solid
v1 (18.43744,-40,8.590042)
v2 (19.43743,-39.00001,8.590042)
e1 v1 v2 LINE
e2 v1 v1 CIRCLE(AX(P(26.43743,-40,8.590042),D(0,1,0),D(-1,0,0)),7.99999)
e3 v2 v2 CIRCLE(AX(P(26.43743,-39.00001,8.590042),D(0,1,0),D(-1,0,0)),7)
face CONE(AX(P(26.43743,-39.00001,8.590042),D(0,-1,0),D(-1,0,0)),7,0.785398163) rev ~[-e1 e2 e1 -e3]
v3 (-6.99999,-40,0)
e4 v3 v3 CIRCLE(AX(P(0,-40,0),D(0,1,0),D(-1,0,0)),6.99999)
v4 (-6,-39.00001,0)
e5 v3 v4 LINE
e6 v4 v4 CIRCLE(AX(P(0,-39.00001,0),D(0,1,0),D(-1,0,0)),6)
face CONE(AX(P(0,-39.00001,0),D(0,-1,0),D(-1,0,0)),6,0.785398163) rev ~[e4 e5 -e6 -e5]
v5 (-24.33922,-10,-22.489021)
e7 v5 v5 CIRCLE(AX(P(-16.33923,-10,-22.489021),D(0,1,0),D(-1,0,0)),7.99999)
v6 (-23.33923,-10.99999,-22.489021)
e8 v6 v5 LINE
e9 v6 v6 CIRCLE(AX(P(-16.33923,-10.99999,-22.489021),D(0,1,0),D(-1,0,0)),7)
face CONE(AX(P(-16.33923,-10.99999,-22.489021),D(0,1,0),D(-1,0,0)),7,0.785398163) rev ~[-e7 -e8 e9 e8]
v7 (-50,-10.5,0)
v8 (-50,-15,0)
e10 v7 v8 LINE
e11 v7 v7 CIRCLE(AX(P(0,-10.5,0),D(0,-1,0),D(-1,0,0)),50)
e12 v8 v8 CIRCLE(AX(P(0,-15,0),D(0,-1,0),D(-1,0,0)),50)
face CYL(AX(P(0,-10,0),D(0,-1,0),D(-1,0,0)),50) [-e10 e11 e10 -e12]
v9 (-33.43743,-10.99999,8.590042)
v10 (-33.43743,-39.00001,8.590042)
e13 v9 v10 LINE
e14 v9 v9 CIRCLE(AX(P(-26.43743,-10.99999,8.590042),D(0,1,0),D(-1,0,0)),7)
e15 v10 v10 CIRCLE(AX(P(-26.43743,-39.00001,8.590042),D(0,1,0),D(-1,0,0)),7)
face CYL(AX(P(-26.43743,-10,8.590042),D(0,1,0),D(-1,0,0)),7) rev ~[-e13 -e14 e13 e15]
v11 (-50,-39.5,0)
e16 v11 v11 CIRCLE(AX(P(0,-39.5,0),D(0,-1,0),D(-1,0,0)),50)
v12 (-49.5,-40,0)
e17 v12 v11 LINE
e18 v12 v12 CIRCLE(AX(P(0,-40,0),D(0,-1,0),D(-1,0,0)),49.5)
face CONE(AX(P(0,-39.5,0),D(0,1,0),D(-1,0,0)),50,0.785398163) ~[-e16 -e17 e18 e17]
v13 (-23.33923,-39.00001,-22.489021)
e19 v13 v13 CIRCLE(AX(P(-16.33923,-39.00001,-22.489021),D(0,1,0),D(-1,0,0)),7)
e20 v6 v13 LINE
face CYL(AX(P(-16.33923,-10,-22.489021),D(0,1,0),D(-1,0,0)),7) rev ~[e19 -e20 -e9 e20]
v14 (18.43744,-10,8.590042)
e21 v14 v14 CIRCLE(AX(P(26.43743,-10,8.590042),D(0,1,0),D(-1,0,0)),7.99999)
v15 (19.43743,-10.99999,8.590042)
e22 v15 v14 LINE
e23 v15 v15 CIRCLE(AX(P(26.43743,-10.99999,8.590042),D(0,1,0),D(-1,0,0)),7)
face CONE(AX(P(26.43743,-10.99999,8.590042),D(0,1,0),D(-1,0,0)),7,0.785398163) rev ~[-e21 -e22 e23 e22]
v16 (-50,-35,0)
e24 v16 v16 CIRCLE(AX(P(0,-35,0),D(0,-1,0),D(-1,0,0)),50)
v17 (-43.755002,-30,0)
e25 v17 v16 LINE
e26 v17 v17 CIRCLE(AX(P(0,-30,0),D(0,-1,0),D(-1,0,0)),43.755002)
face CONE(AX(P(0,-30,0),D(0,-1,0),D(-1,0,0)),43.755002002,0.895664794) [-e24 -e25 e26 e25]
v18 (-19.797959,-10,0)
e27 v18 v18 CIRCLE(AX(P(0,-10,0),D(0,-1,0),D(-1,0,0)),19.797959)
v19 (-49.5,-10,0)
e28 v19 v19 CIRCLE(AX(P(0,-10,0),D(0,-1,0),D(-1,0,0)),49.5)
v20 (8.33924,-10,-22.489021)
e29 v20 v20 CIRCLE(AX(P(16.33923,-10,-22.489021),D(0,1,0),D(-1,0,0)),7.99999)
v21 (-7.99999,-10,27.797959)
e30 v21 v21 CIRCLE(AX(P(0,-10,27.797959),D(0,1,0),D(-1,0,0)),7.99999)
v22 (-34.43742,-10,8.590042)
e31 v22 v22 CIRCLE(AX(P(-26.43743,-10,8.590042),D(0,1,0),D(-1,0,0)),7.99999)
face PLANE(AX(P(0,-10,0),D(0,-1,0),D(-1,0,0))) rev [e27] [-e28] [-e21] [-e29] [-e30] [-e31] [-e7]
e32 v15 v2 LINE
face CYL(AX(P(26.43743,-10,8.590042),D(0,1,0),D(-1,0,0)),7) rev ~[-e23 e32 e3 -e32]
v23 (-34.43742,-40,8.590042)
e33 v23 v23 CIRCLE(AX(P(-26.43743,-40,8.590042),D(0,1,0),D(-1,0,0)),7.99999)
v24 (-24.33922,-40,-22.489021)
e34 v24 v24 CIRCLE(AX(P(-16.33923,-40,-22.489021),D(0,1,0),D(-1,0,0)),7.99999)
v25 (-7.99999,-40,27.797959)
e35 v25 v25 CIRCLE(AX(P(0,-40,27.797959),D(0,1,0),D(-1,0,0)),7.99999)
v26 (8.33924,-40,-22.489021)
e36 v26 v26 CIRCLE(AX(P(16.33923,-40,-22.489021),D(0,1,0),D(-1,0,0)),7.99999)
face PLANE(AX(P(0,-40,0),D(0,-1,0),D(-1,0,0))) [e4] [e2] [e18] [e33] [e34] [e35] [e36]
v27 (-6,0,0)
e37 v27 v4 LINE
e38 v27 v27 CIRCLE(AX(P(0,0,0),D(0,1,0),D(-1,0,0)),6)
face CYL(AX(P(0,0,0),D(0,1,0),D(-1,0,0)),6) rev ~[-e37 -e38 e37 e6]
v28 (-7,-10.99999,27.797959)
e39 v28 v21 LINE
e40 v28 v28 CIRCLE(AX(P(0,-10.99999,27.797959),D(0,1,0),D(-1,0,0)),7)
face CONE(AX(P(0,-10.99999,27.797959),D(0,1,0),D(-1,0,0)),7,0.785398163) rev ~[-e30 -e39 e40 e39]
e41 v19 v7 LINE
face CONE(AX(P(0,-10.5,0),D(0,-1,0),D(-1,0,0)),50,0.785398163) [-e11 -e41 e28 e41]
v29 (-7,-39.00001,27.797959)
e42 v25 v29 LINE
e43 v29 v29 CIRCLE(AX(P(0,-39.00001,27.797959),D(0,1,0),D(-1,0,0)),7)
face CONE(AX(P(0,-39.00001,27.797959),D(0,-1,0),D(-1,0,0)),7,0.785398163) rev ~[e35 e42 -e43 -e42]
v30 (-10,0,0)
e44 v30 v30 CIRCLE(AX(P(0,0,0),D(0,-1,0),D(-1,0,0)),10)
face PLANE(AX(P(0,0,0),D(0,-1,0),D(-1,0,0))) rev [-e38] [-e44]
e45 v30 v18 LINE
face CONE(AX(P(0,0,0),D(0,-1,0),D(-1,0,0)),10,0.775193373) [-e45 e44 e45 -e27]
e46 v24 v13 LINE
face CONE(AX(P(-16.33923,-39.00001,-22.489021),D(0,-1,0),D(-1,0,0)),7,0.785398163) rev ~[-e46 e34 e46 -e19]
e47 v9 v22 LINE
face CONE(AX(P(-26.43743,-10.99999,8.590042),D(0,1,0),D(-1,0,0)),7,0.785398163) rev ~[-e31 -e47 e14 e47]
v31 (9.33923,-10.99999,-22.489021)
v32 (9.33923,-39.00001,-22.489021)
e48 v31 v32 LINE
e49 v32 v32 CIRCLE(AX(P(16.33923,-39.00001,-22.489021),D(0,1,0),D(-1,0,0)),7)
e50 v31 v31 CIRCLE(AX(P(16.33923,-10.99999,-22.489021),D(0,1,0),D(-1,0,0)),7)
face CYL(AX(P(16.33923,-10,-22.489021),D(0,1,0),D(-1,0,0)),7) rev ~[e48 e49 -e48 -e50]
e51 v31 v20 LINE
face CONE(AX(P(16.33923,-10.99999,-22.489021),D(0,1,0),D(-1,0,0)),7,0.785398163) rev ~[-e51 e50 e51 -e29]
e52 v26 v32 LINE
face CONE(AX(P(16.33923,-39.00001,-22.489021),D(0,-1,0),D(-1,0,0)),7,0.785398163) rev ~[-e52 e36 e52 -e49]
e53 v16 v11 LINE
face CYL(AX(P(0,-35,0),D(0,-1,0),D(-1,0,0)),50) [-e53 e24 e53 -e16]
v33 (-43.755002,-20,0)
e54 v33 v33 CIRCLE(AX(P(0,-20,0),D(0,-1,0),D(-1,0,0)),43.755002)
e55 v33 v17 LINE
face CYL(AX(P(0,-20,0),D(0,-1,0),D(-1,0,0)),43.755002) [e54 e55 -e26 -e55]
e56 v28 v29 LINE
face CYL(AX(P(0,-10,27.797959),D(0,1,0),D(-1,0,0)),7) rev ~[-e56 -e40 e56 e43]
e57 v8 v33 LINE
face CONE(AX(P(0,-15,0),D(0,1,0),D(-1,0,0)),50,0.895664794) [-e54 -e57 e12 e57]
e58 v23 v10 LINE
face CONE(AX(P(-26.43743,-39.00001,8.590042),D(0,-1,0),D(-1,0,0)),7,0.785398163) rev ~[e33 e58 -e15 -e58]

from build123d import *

# Parameters (mm, degrees)
F2_R     = 6
F3_DEPTH = 40.001
F4_R     = 7
F5_DEPTH = 30
F6_SIZE  = 0.5
F7_SIZE  = 0.99999


# Not quite as in the source:
# - a fillet or chamfer is up to 0.001 mm smaller than in the source, because OpenCascade refuses the exact size


with BuildPart() as f1:
    # F0 (on Top) → F1 (revolve)
    with BuildSketch(Plane.XY):
        Polygon((-50, -40), (0, -40), (0, 0), (-10, 0), (-19.7979589711, -10), (-50, -10), (-50, -15), (-43.7550020016, -20), (-43.7550020016, -30), (-50, -35), align=None)
    revolve(axis=Axis((0, -20, 0), (0, -1, 0)))

    # F2 (on face) → F3 (cut, through all)
    with BuildSketch(Plane(origin=(0, 0, 0), x_dir=(-1, 0, 0), z_dir=(0, 1, 0))):
        Circle(F2_R)
    extrude(amount=-F3_DEPTH, mode=Mode.SUBTRACT)

    # F4 (on face) → F5 (cut)
    with BuildSketch(Plane(origin=(0, -10, 0), x_dir=(-1, 0, 0), z_dir=(0, 1, 0))):
        with Locations((0, 27.7979589711)):
            Circle(F4_R)
        with Locations((26.4374300192, 8.590041731)):
            Circle(F4_R)
        with Locations((16.3392303271, -22.4890212166)):
            Circle(F4_R)
        with Locations((-16.3392303271, -22.4890212166)):
            Circle(F4_R)
        with Locations((-26.4374300192, 8.590041731)):
            Circle(F4_R)
    extrude(amount=-F5_DEPTH, mode=Mode.SUBTRACT)

    # F6
    f6_edges = [f1.edges().sort_by_distance(p)[0] for p in [
        (50, -40, 0),
        (50, -10, 0),
    ]]
    chamfer(f6_edges, length=F6_SIZE)

    # F7 (size 1 in the source; OpenCascade refuses exactly that, so slightly less here)
    f7_edges = [f1.edges().sort_by_distance(p)[0] for p in [
        (7, -10, 27.797959),
        (-19.43743, -10, 8.590042),
        (-9.33923, -10, -22.489021),
        (23.33923, -10, -22.489021),
        (33.43743, -10, 8.590042),
        (-9.33923, -40, -22.489021),
        (-19.43743, -40, 8.590042),
        (33.43743, -40, 8.590042),
        (23.33923, -40, -22.489021),
        (6, -40, 0),
        (7, -40, 27.797959),
    ]]
    chamfer(f7_edges, length=F7_SIZE)


solid = f1.part
